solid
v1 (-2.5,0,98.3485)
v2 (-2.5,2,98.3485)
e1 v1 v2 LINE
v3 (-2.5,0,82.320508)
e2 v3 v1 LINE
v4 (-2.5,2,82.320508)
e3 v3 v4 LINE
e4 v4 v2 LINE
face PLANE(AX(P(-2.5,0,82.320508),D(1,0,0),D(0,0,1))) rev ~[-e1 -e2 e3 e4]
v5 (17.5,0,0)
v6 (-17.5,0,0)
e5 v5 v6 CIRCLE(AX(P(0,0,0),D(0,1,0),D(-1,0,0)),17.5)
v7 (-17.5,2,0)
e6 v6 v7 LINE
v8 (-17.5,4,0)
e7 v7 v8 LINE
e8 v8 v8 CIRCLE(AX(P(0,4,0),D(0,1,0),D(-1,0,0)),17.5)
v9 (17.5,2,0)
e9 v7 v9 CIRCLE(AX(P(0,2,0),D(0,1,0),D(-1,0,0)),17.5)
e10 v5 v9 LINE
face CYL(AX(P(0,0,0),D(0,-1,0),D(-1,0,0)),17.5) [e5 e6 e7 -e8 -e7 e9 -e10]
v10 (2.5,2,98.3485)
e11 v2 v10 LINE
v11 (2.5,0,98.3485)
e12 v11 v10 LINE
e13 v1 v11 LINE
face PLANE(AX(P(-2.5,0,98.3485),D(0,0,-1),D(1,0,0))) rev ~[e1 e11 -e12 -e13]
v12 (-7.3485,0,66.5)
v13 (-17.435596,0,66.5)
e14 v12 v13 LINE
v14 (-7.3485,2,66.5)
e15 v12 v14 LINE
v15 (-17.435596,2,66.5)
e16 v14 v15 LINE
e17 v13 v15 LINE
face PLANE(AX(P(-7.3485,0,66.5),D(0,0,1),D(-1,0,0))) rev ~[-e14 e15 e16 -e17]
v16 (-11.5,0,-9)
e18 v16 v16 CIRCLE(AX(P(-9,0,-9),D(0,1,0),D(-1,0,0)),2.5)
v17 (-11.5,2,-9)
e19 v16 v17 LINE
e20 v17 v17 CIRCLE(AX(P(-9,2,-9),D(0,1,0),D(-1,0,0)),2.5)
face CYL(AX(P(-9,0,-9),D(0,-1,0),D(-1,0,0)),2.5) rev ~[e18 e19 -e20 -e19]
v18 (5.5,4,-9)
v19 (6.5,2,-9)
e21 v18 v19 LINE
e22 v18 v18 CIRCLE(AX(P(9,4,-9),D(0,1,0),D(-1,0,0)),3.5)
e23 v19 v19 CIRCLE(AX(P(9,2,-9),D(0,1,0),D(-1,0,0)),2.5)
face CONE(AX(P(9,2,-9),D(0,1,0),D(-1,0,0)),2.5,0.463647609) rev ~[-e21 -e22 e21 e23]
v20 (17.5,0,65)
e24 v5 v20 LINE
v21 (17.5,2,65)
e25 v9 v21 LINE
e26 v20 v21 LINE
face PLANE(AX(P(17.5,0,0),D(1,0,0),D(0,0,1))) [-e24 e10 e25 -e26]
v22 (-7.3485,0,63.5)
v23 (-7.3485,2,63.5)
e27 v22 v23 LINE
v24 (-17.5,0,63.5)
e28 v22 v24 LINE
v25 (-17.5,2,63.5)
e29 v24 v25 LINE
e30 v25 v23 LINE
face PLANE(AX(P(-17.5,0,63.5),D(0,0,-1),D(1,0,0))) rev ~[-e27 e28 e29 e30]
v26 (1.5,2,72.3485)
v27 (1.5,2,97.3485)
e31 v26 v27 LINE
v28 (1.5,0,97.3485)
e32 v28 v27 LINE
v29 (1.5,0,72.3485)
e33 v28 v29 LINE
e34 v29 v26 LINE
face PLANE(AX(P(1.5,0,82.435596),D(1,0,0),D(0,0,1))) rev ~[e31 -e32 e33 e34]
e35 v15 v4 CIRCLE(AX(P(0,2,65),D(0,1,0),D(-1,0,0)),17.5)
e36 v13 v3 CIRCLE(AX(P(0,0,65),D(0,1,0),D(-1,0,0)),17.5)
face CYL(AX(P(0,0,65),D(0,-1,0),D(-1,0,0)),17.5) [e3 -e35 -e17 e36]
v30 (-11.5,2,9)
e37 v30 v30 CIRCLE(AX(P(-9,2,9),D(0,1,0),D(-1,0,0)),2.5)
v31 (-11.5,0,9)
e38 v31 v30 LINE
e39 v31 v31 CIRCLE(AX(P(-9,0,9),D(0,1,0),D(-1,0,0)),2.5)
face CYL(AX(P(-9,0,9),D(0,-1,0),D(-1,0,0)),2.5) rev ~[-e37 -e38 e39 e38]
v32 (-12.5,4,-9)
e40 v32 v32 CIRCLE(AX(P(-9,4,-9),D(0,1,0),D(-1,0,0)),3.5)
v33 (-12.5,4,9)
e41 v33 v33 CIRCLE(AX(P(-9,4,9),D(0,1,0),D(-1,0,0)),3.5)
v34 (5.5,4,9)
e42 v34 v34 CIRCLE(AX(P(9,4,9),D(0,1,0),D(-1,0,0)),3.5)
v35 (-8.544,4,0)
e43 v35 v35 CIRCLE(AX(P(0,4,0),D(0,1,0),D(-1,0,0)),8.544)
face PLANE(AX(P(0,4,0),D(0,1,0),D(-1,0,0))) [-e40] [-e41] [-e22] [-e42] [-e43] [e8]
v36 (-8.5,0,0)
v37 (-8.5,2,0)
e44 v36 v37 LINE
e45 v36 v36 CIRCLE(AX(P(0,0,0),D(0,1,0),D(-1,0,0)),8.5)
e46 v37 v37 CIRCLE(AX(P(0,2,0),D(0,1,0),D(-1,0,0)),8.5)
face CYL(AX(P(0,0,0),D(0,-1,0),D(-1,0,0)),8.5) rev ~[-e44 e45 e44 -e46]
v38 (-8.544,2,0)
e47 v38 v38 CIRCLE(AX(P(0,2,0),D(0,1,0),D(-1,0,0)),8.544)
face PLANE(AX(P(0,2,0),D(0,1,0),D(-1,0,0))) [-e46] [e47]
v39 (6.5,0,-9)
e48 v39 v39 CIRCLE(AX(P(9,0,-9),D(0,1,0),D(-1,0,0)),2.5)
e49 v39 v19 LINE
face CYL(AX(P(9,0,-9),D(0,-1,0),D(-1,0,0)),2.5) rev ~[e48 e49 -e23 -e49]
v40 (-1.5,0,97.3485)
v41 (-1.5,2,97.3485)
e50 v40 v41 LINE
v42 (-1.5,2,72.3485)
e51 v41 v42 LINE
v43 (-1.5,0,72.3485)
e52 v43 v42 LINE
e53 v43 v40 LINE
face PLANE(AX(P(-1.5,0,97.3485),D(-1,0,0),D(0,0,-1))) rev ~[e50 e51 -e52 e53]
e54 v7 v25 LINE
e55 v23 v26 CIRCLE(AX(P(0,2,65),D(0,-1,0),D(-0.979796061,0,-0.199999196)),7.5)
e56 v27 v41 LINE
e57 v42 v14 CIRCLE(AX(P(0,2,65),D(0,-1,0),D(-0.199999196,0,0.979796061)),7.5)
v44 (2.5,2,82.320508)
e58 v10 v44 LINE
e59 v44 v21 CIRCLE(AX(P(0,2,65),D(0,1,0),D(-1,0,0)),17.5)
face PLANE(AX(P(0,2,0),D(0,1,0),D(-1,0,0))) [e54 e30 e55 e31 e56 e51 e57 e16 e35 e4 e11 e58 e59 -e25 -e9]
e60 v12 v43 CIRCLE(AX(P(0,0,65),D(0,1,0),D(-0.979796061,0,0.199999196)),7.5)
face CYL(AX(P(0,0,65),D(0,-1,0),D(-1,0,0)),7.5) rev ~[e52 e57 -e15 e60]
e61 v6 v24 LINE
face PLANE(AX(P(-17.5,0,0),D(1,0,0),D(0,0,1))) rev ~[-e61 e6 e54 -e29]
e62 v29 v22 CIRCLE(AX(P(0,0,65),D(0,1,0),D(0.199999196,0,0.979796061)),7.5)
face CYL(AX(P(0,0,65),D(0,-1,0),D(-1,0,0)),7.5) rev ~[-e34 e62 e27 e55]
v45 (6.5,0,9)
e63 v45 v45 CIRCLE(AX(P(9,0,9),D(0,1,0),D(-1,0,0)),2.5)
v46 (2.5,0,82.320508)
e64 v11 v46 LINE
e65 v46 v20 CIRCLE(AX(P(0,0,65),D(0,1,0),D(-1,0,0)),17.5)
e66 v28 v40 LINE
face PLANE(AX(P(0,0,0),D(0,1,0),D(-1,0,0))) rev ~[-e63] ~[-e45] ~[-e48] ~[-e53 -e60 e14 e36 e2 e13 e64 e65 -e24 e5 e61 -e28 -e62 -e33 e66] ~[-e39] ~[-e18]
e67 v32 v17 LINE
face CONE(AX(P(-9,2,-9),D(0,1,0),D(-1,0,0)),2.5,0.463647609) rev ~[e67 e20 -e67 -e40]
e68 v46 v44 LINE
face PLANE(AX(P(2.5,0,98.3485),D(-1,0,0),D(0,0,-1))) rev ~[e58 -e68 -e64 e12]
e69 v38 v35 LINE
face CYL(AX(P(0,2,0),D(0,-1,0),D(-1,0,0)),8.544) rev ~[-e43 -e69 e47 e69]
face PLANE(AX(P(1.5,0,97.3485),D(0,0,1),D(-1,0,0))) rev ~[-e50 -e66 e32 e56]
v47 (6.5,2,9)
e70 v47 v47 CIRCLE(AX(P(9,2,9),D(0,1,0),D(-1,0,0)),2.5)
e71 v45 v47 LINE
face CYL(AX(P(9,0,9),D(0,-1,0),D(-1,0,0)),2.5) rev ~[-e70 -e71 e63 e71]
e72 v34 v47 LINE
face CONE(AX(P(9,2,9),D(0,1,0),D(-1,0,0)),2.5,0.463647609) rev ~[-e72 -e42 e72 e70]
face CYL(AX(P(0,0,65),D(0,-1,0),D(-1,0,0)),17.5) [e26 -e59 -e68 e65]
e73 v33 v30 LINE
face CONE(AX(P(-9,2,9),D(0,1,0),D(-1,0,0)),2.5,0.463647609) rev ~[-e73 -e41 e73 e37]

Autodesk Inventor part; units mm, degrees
ref_plane "YZ Plane" through (0, 0, 0) normal (1, 0, 0) x (0, 1, 0)
ref_plane "XZ Plane" through (0, 0, 0) normal (0, 1, 0) x (-1, 0, 0)
ref_plane "XY Plane" through (0, 0, 0) normal (0, 0, 1) x (1, 0, 0)
sketch "Esquisse3" plane through (0, 0, 0) normal (0, 1, 0) x (-1, 0, 0)
  line L0 (-6.5, 6.5) -> (6.5, 6.5) construction
  line L1 (6.5, 6.5) -> (6.5, -6.5) construction
  line L2 (6.5, -6.5) -> (-6.5, -6.5) construction
  line L3 (-6.5, -6.5) -> (-6.5, 6.5) construction
  line L4 (-6.5, 6.5) -> (6.5, -6.5) construction
  line L5 (6.5, 6.5) -> (-6.5, -6.5) construction
  line L6 (-11.5, 11.5) -> (11.5, 11.5) construction
  line L7 (11.5, 11.5) -> (11.5, -11.5) construction
  line L8 (11.5, -11.5) -> (-11.5, -11.5) construction
  line L9 (-11.5, -11.5) -> (-11.5, 11.5) construction
  line L10 (-11.5, 11.5) -> (11.5, -11.5) construction
  line L11 (11.5, 11.5) -> (-11.5, -11.5) construction
  line L12 (-6.5, 6.5) -> (-11.5, 6.5) construction
  line L13 (-11.5, 6.5) -> (-11.5, 11.5) construction
  line L14 (-11.5, 11.5) -> (-6.5, 11.5) construction
  line L15 (-6.5, 11.5) -> (-6.5, 6.5) construction
  line L16 (-6.5, -6.5) -> (-11.5, -6.5) construction
  line L17 (-11.5, -6.5) -> (-11.5, -11.5) construction
  line L18 (-11.5, -11.5) -> (-6.5, -11.5) construction
  line L19 (-6.5, -11.5) -> (-6.5, -6.5) construction
  line L20 (6.5, -6.5) -> (11.5, -6.5) construction
  line L21 (11.5, -6.5) -> (11.5, -11.5) construction
  line L22 (11.5, -11.5) -> (6.5, -11.5) construction
  line L23 (6.5, -11.5) -> (6.5, -6.5) construction
  line L24 (11.5, 11.5) -> (6.5, 11.5) construction
  line L25 (6.5, 11.5) -> (6.5, 6.5) construction
  line L26 (6.5, 6.5) -> (11.5, 6.5) construction
  line L27 (11.5, 6.5) -> (11.5, 11.5) construction
  circle A0 centre (9, 9) radius 2.5
  circle A1 centre (9, -9) radius 2.5
  circle A2 centre (-9, -9) radius 2.5
  circle A3 centre (-9, 9) radius 2.5
  circle A4 centre (0, 0) radius 17.5
  circle A5 centre (0, 0) radius 8.5
  line L28 (17.5, 0) -> (17.5, 65)
  line L29 (-17.5, 0) -> (-17.5, 65)
  line L30 (0, -17.5) -> (0, 82.5) construction
  circle A6 centre (0, 65) radius 17.5
  circle A7 centre (0, 65) radius 7.5
  line L31 (1.5, 72.3485) -> (-1.5, 72.3485)
  line L32 (-1.5, 72.3485) -> (-1.5, 97.3485)
  line L33 (-1.5, 97.3485) -> (1.5, 97.3485)
  line L34 (1.5, 97.3485) -> (1.5, 72.3485)
  line L35 (-2.5, 98.3485) -> (-2.5, 71.3485)
  line L36 (-2.5, 71.3485) -> (2.5, 71.3485)
  line L37 (2.5, 71.3485) -> (2.5, 98.3485)
  line L38 (2.5, 98.3485) -> (-2.5, 98.3485)
  line L39 (17.5, 63.5) -> (7.3485, 63.5)
  line L40 (7.3485, 63.5) -> (7.3485, 66.5)
  line L41 (7.3485, 66.5) -> (17.5, 66.5)
  line L42 (17.5, 66.5) -> (17.5, 63.5)
  point P0 (17.4356, 66.5)
  point P1 (2.5, 82.3205)
  point P2 (-2.5, 82.3205)
  dimension "d1" = 13
  dimension "d2" = 13
  dimension "d3" = 5
  dimension "d4" = 35
  dimension "d9" = 9
  dimension "d29" = 100
  dimension "d31" = 35
  dimension "d32" = 15
  dimension "d33" = 3
  dimension "d34" = 25
  dimension "d36" = 1
  dimension "d37" = 3
extrude "Extrusion1" add sketch "Esquisse3" along normal blind 2 contours A4 | A4 L29 A6 L39 L28 | A6 L35 A7 L39 | L35 L38 L37 A6 L34 L33 L32 | A6 L32 A7 L35 | L41 A7 L37 A6 | L37 A7 L34 A6
sketch "Esquisse4" plane through (0, 2, 0) normal (0, 1, 0) x (-1, 0, 0)
  circle A0 centre (9, -9) radius 3.5
  circle A1 centre (9, -9) radius 2.5 projected
  circle A2 centre (-9, -9) radius 3.5
  circle A3 centre (-9, 9) radius 3.5
  circle A4 centre (9, 9) radius 3.5
  circle A5 centre (-9, -9) radius 2.5 projected
  circle A6 centre (-9, 9) radius 2.5 projected
  circle A7 centre (9, 9) radius 2.5 projected
  circle A8 centre (0, 0) radius 17.5
  circle A9 centre (0, 0) radius 8.544
  circle A10 centre (-9, -9) radius 2.5 projected
  circle A11 centre (-9, -9) radius 2.5
  circle A12 centre (-9, 9) radius 2.5
  circle A13 centre (9, 9) radius 2.5
  dimension "d10" = 7
  dimension "d11" = 7
  dimension "d12" = 7
  dimension "d13" = 7
extrude "Extrusion2" add sketch "Esquisse4" along normal blind 2 contours A0 | A2 | A3 | A4 | A8
chamfer "Chanfrein1" distance 1 distance2 2 1 edges at (-6.5, 4, -9) measured on face at (-3.3085, 4, -12.0053)
chamfer "Chanfrein2" distance 1 distance2 2 1 edges at (11.5, 4, -9) measured on face at (3.3085, 4, 12.0053)
chamfer "Chanfrein3" distance 1 distance2 2 1 edges at (-6.5, 4, 9) measured on face at (3.3085, 4, 12.0053)
chamfer "Chanfrein4" distance 1 distance2 2 1 edges at (11.5, 4, 9) measured on face at (3.3085, 4, 12.0053)
sketch "Esquisse7" plane through (0, 2, 0) normal (0, 1, 0) x (1, 0, 0)
  point P0 (0, 0)
properties part number "Pièce_moteur_maintient_test_3"
